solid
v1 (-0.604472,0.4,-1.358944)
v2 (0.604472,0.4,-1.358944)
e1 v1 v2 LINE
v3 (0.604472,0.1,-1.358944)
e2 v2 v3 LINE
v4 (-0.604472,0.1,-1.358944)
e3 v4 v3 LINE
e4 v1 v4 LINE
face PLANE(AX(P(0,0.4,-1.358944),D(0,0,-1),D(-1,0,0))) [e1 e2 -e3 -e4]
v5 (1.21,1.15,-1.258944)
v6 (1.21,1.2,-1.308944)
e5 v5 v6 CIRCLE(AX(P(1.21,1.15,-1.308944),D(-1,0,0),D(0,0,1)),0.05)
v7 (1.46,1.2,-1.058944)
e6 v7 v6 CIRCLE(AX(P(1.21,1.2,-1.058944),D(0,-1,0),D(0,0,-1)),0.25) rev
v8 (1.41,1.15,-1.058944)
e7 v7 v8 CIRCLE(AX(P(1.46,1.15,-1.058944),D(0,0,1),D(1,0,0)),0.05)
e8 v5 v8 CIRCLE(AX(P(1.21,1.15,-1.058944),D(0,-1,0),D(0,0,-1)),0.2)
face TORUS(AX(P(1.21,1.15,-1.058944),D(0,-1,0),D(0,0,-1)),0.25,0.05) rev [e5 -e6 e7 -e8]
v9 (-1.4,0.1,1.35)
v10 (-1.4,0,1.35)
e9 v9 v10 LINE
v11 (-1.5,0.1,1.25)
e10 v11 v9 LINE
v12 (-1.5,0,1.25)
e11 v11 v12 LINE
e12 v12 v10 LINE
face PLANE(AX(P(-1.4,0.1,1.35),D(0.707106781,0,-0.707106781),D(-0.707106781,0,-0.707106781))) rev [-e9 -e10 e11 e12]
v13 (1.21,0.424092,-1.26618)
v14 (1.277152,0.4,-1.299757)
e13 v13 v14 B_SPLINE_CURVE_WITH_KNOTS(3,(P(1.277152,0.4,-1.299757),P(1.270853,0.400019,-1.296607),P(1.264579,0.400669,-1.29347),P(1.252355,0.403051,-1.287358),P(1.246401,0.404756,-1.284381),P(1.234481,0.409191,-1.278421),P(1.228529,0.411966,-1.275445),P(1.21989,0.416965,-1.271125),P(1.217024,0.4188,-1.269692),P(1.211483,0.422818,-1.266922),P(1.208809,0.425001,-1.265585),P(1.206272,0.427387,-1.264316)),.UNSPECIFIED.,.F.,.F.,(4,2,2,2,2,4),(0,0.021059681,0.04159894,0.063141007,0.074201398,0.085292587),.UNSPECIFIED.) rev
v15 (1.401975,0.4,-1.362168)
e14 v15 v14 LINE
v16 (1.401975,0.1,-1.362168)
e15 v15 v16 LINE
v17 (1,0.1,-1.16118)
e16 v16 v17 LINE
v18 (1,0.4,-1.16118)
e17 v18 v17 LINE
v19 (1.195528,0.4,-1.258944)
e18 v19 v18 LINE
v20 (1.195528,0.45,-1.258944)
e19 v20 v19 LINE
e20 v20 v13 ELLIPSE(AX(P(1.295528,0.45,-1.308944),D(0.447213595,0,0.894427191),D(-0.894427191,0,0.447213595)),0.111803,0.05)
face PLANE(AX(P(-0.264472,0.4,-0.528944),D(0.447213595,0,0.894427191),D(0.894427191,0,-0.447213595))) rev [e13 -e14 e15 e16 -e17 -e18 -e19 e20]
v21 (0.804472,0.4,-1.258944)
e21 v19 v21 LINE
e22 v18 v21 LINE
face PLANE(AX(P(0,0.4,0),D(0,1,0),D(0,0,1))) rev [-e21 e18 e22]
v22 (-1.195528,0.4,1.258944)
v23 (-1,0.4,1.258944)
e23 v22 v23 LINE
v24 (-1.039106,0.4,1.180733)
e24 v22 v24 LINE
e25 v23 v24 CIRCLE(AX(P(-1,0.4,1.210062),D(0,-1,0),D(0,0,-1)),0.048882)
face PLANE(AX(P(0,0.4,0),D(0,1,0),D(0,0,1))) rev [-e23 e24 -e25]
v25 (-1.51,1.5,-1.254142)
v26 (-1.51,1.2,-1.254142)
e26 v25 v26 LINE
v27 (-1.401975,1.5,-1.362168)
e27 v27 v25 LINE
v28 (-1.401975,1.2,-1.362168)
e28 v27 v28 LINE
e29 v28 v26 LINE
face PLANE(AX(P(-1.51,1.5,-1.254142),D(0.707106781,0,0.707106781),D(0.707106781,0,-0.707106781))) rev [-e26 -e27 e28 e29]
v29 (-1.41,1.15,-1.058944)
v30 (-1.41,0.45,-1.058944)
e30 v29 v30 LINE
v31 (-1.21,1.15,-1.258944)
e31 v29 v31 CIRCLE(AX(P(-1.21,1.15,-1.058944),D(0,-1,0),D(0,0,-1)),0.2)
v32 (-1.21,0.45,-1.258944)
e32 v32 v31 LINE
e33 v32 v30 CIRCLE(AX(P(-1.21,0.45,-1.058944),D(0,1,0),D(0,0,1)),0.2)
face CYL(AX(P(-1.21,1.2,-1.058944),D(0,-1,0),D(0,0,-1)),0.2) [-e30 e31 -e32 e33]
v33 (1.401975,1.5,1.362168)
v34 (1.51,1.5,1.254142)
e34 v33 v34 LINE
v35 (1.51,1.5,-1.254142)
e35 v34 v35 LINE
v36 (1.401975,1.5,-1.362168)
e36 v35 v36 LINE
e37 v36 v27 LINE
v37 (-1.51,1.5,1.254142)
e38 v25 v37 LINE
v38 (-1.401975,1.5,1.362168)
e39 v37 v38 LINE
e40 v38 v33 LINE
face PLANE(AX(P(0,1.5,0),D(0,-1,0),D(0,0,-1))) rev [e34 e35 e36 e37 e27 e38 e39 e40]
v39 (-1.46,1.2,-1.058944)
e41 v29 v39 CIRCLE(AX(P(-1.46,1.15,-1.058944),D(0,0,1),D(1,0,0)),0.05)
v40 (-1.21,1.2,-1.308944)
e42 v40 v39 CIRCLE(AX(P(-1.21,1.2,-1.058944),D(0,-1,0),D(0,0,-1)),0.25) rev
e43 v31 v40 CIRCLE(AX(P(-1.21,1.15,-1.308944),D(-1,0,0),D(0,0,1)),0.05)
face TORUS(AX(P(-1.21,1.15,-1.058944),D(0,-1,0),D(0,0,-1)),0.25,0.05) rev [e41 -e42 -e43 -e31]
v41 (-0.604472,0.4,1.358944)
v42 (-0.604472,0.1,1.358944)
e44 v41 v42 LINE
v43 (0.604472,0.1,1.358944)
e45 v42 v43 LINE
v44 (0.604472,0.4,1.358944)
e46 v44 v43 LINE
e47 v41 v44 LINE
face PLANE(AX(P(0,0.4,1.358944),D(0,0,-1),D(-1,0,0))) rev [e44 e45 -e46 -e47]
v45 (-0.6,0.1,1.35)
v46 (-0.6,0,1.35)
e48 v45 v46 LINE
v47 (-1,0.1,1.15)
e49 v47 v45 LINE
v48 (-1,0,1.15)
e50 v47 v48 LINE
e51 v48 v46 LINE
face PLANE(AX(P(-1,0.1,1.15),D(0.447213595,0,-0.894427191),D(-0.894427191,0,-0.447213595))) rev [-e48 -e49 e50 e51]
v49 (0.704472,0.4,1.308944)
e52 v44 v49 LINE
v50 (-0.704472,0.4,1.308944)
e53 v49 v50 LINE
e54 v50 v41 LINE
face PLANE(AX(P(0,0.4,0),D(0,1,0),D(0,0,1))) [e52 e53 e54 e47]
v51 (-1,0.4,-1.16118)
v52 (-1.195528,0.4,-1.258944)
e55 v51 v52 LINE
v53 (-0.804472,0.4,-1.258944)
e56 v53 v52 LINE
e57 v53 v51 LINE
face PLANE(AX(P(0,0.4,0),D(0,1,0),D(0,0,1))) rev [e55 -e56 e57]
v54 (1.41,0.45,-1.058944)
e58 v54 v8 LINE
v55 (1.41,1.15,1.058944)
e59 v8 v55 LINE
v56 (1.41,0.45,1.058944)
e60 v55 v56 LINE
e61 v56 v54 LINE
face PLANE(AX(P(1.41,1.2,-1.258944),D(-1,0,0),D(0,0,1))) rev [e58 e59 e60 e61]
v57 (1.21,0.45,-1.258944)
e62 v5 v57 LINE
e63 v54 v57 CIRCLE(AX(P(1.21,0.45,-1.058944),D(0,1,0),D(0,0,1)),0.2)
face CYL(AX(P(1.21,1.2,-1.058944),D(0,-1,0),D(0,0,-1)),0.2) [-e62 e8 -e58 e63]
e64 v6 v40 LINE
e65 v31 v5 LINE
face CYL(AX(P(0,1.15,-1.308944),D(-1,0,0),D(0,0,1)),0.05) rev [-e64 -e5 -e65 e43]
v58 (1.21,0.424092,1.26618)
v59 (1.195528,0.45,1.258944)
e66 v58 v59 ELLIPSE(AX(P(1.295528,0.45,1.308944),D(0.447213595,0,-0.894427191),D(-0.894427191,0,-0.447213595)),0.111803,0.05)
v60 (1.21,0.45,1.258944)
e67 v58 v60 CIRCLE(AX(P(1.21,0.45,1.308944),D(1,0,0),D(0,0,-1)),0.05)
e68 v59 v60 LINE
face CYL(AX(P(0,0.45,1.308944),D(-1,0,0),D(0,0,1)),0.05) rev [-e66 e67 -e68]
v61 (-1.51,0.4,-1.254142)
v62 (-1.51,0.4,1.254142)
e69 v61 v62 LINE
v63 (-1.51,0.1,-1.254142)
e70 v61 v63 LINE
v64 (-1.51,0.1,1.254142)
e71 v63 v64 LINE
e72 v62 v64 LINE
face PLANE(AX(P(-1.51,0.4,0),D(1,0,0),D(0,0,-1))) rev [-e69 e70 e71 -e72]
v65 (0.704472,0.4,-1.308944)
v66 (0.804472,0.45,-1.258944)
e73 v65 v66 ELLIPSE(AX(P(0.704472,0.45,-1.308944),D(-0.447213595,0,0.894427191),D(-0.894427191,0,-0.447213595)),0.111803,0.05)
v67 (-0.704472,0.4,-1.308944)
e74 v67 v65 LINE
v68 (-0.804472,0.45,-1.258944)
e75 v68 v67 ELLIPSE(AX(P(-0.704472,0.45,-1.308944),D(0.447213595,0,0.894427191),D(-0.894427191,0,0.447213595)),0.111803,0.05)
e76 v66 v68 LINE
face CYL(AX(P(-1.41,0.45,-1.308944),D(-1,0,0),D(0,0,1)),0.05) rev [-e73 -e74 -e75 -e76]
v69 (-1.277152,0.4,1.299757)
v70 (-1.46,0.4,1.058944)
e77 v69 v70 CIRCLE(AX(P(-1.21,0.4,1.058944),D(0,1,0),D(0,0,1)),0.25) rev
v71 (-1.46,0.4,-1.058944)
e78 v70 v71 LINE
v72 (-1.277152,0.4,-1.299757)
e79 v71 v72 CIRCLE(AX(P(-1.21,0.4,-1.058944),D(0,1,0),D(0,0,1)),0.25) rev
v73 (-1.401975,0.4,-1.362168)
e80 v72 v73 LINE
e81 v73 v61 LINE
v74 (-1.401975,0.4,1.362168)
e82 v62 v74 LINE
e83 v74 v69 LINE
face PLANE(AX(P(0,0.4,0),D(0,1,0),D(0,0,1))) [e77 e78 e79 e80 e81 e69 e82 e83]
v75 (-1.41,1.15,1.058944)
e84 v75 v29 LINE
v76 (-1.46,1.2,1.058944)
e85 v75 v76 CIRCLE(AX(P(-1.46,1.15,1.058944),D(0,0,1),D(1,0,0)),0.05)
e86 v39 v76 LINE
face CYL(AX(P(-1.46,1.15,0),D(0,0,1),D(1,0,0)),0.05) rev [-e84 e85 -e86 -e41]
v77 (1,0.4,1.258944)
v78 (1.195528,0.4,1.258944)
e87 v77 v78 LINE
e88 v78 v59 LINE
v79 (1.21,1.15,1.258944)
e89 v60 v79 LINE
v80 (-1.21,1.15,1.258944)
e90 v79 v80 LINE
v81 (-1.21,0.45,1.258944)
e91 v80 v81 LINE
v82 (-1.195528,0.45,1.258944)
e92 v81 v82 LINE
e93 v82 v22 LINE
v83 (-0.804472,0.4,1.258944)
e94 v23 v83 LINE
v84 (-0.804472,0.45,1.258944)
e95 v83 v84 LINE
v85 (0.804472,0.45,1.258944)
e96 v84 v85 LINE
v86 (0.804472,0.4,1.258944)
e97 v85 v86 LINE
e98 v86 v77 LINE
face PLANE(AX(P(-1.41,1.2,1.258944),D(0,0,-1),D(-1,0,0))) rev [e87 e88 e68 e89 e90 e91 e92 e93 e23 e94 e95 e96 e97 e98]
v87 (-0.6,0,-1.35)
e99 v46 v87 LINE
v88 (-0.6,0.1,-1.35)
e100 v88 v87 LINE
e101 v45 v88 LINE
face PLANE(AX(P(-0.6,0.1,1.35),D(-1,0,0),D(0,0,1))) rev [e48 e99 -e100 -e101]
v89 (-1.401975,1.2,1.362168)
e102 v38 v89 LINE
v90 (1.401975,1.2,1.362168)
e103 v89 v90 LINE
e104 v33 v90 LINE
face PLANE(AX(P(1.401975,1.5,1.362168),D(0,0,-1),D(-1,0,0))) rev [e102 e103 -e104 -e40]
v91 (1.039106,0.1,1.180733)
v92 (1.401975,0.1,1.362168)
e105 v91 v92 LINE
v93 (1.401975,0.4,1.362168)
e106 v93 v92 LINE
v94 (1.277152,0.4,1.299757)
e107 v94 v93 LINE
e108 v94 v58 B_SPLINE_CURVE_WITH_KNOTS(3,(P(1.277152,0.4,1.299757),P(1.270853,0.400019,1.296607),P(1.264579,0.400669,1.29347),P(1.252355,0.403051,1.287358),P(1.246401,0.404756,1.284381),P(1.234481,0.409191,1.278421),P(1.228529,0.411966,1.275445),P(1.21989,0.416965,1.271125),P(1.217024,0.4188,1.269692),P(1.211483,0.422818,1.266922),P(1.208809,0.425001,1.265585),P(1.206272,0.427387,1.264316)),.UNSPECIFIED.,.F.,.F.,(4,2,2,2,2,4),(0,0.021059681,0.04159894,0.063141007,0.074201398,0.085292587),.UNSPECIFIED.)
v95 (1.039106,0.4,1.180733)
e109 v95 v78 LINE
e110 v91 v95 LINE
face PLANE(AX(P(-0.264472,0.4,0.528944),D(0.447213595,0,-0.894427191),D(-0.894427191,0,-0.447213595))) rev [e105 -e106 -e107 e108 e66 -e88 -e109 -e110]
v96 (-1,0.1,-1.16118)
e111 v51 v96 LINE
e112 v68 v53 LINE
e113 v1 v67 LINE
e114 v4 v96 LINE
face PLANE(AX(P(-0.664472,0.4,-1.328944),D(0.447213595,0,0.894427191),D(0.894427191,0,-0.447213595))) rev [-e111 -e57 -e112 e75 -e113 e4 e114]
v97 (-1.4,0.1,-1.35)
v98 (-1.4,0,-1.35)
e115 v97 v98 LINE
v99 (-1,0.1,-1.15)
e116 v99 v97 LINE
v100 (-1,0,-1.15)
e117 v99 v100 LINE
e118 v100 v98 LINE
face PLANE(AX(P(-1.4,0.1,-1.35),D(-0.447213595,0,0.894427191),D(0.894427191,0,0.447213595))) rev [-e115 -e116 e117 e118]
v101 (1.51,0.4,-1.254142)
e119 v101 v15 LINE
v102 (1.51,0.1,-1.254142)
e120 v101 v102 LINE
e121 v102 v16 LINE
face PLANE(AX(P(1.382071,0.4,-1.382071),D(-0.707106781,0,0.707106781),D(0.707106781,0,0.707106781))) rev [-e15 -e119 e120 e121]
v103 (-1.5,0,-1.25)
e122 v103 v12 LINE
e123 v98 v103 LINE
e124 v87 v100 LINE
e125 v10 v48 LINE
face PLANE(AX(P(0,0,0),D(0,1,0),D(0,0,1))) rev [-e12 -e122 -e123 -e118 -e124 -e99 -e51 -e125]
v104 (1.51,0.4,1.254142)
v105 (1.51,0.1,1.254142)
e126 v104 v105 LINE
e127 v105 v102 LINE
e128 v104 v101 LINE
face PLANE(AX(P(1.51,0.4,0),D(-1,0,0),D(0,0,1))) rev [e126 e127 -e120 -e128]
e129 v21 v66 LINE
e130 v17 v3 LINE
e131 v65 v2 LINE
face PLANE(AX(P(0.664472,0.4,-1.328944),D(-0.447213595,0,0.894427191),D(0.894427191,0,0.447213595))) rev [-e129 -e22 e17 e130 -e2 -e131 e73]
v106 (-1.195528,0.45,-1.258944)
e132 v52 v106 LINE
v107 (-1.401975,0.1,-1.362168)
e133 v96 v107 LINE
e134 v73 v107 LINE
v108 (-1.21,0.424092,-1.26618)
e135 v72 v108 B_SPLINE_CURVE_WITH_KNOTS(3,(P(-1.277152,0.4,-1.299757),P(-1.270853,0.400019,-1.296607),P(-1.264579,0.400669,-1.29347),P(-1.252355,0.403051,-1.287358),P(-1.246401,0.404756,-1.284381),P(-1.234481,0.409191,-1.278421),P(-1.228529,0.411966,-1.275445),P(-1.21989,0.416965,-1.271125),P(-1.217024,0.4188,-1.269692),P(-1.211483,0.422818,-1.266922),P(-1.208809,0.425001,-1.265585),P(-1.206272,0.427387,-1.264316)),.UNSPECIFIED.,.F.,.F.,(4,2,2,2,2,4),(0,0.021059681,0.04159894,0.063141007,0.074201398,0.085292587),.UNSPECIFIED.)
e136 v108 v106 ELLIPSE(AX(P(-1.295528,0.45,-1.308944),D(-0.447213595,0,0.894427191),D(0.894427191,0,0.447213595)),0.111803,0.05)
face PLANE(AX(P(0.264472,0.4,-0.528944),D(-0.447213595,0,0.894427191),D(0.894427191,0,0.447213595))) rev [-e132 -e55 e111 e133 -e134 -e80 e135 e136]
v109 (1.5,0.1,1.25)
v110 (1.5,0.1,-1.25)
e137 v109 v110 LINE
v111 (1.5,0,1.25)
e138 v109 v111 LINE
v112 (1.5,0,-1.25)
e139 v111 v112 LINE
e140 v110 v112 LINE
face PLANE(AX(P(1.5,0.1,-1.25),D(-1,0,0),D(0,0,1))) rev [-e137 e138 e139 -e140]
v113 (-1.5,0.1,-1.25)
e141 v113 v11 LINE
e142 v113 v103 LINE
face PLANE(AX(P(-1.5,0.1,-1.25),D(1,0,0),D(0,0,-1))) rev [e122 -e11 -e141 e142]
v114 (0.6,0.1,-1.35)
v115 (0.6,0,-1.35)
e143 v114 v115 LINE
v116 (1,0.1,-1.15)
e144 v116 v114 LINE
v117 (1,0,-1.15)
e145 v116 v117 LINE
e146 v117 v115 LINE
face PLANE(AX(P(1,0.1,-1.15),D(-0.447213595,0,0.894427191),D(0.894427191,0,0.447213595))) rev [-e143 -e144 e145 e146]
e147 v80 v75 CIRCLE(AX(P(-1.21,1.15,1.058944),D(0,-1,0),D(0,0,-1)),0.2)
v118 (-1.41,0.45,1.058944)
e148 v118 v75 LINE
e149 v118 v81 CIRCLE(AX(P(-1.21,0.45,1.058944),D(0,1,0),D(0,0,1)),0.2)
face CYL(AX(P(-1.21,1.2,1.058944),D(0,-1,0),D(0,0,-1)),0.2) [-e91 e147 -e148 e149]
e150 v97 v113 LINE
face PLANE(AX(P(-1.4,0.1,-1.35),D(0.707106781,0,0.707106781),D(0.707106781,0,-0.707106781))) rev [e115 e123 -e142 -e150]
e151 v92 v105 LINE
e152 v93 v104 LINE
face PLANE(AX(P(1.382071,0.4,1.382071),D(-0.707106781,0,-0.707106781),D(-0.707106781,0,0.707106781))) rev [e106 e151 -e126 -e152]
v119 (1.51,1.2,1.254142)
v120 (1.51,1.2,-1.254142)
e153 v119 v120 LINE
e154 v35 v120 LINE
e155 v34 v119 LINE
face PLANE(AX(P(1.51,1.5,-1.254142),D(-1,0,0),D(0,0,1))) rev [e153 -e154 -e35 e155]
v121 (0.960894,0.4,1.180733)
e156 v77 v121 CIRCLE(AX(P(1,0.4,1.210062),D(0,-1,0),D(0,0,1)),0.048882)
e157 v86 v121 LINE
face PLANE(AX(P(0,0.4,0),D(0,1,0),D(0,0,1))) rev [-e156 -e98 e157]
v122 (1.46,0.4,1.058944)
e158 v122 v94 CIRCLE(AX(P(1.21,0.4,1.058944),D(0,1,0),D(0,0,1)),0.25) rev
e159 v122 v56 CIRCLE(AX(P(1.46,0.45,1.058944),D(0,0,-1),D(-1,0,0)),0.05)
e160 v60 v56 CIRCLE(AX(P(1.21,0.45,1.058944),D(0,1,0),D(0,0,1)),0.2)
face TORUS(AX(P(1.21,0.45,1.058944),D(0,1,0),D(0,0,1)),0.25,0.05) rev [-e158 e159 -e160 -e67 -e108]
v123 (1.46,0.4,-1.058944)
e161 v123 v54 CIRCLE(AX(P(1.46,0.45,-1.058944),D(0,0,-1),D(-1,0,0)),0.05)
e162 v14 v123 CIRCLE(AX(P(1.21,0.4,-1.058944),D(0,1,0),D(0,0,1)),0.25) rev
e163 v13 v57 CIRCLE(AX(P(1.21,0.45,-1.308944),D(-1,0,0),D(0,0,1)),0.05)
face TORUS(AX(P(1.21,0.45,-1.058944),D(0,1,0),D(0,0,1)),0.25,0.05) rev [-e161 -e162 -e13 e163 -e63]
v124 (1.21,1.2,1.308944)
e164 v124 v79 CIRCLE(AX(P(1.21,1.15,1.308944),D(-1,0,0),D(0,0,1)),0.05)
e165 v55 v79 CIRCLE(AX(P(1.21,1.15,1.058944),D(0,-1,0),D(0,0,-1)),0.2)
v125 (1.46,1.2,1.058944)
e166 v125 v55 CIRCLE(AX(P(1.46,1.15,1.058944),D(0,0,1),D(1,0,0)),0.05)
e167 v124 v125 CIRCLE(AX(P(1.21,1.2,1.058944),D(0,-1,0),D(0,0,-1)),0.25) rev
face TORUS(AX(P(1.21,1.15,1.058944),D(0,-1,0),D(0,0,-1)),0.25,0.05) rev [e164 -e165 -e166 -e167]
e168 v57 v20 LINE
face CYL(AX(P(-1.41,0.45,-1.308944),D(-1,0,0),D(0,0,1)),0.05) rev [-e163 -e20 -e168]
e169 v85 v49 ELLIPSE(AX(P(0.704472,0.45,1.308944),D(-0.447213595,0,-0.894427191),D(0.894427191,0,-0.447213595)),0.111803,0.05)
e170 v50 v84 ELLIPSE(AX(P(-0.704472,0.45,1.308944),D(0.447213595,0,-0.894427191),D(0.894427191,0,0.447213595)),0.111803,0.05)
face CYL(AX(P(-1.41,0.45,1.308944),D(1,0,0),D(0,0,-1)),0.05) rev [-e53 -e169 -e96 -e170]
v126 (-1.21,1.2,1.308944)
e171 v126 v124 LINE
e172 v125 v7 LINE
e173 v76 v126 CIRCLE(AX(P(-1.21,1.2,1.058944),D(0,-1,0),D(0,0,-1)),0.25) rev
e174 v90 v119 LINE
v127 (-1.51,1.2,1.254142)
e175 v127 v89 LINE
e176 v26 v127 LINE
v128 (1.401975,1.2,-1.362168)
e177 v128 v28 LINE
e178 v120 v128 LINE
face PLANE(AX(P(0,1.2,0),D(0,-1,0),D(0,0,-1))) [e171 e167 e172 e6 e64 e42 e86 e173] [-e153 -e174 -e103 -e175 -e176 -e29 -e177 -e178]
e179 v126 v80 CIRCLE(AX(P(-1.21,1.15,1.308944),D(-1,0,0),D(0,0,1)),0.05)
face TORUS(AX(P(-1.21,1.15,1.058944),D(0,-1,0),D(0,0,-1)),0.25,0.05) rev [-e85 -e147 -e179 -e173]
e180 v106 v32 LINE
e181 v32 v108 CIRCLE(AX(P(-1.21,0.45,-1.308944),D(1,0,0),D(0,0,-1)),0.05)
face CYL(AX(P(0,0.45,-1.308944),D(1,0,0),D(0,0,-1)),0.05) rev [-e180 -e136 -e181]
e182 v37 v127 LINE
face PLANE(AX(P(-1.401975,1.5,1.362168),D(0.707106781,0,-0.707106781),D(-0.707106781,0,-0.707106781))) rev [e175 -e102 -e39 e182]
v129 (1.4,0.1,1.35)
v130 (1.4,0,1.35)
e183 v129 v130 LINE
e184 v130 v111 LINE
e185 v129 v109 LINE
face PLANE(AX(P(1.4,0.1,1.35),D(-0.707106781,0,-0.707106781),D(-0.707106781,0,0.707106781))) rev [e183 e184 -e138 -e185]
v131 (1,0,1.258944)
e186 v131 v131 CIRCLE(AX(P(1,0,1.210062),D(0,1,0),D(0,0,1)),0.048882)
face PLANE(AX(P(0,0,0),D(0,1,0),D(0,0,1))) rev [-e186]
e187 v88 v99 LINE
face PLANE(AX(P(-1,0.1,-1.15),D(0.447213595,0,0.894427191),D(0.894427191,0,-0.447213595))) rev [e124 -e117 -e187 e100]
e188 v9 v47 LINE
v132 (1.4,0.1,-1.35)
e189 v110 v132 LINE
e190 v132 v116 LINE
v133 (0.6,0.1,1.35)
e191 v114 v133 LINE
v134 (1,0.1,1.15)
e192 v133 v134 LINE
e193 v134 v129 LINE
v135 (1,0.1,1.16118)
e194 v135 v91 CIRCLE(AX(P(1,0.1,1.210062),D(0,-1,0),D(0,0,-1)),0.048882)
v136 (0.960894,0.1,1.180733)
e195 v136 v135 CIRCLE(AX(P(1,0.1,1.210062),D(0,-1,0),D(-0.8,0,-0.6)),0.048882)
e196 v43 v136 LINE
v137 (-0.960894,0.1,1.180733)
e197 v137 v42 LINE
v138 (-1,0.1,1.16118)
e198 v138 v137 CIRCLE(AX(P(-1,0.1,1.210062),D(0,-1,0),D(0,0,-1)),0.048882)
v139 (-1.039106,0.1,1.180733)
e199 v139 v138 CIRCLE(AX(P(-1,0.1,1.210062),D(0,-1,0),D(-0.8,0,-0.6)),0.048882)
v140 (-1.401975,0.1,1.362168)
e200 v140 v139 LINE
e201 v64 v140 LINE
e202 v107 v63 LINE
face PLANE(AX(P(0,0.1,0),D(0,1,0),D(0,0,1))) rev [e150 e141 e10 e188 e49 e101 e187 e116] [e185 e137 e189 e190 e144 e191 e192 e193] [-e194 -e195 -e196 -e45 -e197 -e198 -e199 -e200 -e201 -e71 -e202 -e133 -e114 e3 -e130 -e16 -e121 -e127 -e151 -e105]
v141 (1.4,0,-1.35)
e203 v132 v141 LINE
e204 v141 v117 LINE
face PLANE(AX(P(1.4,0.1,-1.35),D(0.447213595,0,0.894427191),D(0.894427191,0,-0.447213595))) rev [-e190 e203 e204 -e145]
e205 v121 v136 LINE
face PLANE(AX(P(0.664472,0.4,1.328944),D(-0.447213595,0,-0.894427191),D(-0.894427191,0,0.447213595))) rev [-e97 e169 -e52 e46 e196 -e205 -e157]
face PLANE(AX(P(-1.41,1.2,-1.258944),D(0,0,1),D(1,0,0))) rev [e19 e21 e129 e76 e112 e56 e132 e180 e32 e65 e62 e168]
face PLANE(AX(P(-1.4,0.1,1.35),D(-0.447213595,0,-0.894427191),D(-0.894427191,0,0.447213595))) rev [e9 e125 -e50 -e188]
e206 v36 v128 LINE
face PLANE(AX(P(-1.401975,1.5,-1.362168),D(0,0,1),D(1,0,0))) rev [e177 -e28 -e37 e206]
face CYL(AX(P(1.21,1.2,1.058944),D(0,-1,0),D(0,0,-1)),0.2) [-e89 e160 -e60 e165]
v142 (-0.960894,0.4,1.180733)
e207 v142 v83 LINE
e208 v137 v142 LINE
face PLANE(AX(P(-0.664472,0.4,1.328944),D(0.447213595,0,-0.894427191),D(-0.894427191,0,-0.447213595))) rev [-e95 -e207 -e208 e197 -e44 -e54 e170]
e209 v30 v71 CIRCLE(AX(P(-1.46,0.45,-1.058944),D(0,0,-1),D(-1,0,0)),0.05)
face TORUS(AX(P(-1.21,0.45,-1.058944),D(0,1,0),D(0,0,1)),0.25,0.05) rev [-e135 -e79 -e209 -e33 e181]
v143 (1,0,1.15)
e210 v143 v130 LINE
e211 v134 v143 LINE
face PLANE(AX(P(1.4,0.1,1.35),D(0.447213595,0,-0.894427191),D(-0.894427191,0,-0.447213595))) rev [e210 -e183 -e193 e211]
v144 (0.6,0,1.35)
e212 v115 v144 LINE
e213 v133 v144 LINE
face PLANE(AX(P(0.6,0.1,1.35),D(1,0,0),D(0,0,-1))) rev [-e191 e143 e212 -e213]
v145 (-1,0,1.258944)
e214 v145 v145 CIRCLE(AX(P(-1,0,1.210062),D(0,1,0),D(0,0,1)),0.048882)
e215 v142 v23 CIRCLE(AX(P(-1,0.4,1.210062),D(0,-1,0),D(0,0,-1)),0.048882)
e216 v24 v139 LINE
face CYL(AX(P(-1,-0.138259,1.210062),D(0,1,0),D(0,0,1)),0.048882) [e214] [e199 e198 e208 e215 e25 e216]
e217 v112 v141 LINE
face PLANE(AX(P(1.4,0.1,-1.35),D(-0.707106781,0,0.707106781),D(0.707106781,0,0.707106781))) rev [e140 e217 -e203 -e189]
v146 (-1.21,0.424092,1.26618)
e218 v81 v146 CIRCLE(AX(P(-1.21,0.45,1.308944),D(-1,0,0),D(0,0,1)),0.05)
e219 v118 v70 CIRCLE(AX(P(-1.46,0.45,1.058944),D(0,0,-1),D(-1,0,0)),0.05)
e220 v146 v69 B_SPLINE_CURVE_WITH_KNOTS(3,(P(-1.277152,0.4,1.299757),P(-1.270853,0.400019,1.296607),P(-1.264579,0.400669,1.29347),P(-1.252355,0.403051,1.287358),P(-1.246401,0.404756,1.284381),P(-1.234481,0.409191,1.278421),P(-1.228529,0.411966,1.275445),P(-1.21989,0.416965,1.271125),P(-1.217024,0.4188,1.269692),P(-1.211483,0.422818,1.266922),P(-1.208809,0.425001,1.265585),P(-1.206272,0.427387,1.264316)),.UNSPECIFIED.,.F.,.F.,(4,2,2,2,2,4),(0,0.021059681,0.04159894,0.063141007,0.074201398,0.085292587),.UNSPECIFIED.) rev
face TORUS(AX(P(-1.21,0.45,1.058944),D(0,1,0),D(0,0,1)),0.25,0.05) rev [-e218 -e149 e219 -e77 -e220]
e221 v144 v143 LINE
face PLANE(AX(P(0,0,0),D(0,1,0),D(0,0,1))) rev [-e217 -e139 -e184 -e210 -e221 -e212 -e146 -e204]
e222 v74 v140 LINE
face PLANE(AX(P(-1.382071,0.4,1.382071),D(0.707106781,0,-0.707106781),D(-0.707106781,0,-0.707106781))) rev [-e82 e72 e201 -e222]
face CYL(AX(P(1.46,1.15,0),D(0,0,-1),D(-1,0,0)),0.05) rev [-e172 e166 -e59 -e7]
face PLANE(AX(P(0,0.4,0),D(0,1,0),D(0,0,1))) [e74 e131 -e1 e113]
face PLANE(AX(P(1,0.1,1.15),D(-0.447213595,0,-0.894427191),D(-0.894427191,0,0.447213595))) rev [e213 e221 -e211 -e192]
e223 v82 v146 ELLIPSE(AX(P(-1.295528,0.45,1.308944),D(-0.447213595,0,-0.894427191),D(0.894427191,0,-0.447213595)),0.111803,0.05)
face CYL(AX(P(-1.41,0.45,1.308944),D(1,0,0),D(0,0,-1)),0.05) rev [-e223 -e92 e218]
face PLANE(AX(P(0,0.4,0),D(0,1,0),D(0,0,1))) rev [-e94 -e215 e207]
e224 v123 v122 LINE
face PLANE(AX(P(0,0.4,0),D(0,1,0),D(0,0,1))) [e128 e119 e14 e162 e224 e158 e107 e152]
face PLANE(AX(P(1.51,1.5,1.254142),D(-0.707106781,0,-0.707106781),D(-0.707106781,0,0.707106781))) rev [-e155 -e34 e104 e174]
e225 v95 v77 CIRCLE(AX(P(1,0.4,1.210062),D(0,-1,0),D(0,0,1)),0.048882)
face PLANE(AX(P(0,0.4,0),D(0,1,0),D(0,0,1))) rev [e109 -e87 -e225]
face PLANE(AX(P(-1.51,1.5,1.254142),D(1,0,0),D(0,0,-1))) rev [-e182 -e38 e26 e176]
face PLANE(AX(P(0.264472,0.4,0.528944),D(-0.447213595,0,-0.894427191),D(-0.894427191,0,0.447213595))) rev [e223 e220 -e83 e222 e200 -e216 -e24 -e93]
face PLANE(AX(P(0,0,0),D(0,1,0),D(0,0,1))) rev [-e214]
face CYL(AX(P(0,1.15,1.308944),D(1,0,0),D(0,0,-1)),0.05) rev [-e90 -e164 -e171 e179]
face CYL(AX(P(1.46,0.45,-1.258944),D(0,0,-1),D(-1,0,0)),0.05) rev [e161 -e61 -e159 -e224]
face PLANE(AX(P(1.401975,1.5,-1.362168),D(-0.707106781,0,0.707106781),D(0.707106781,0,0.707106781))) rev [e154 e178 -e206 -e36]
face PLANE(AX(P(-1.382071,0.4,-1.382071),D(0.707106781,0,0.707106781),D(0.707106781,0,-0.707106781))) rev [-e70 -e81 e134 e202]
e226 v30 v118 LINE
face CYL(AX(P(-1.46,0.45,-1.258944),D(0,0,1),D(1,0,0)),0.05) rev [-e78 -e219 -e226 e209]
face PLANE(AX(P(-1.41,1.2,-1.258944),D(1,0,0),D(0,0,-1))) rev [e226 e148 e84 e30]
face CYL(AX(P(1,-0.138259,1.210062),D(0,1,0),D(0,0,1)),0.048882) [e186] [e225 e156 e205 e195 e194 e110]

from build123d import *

# Parameters (mm, degrees)
RESSALTO_EXTRUS_O1_DEPTH   = 0.1
RESSALTO_EXTRUS_O1_2_DEPTH = 0.1
RESSALTO_EXTRUS_O2_DEPTH   = 0.3
ESBO_O3_W                  = 2.82
ESBO_O3_H                  = 2.517888544
RESSALTO_EXTRUS_O3_DEPTH   = 0.8
RESSALTO_EXTRUS_O4_DEPTH   = 0.3
FILETE1_R                  = 0.2
FILETE2_R                  = 0.05
FILETE3_R                  = 0.05
RESSALTO_EXTRUS_O5_REACH   = 4.312
ESBO_O5_R                  = 0.048881966


with BuildPart() as part:
    # Esboço1 → Ressalto-extrusão1 (new body)
    with BuildSketch(Plane(origin=(0, 0, 0), x_dir=(1, 0, 0), z_dir=(0, 1, 0))):
        Polygon((-1.5, 1.25), (-1.5, -1.25), (-1.4, -1.35), (-1, -1.15), (-0.6, -1.35), (-0.6, 1.35), (-1, 1.15), (-1.4, 1.35), align=None)
    extrude(amount=RESSALTO_EXTRUS_O1_DEPTH)



with BuildPart() as body_2:
    # Esboço1 → Ressalto-extrus_o1 2 (new body)
    with BuildSketch(Plane(origin=(0, 0, 0), x_dir=(1, 0, 0), z_dir=(0, 1, 0))):
        Polygon((1.4, -1.35), (1.5, -1.25), (1.5, 1.25), (1.4, 1.35), (1, 1.15), (0.6, 1.35), (0.6, -1.35), (1, -1.15), align=None)
    extrude(amount=RESSALTO_EXTRUS_O1_2_DEPTH)


with BuildPart() as part_1:
    add(part.part)

    add(body_2.part)  # Ressalto-extrusão2 merges body 2
    # Esboço2 → Ressalto-extrusão2 (add)
    with BuildSketch(Plane(origin=(0, 0.1, 0), x_dir=(1, 0, 0), z_dir=(0, 1, 0))):
        Polygon((-0.604472136, 1.358944272), (-1, 1.16118034), (-1.40197453, 1.362167605), (-1.51, 1.254142136), (-1.51, -1.254142136), (-1.40197453, -1.362167605), (-1, -1.16118034), (-0.604472136, -1.358944272), (0.604472136, -1.358944272), (1, -1.16118034), (1.40197453, -1.362167605), (1.51, -1.254142136), (1.51, 1.254142136), (1.40197453, 1.362167605), (1, 1.16118034), (0.604472136, 1.358944272), align=None)
    extrude(amount=RESSALTO_EXTRUS_O2_DEPTH)

    # Esboço3 → Ressalto-extrusão3 (add)
    with BuildSketch(Plane(origin=(0, 0.4, 0), x_dir=(1, 0, 0), z_dir=(0, 1, 0))):
        Rectangle(ESBO_O3_W, ESBO_O3_H)
    extrude(amount=RESSALTO_EXTRUS_O3_DEPTH)

    # Esboço4 → Ressalto-extrusão4 (add)
    with BuildSketch(Plane(origin=(0, 1.2, 0), x_dir=(1, 0, 0), z_dir=(0, 1, 0))):
        Polygon((-1.51, 1.254142136), (-1.40197453, 1.362167605), (1.40197453, 1.362167605), (1.51, 1.254142136), (1.51, -1.254142136), (1.40197453, -1.362167605), (-1.40197453, -1.362167605), (-1.51, -1.254142136), align=None)
    extrude(amount=RESSALTO_EXTRUS_O4_DEPTH)

    # Filete1
    filete1_edges = [part_1.edges().sort_by_distance(p)[0] for p in [
        (1.41, 0.8, 1.258944272),
        (1.41, 0.8, -1.258944272),
        (-1.41, 0.8, -1.258944272),
        (-1.41, 0.8, 1.258944272),
    ]]
    fillet(filete1_edges, radius=FILETE1_R)

    # Filete2
    filete2_edges = [part_1.edges().sort_by_distance(p)[0] for p in [
        (-1.41, 1.2, 0),
        (0, 1.2, -1.258944272),
        (1.41, 1.2, 0),
        (0, 1.2, 1.258944272),
        (-1.351421356, 1.2, -1.200365628),
        (1.351421356, 1.2, -1.200365628),
        (1.351421356, 1.2, 1.200365628),
        (-1.351421356, 1.2, 1.200365628),
    ]]
    fillet(filete2_edges, radius=FILETE2_R)

    # Filete3
    # the kernel refuses this fillet: 0.05 mm, written as the material it adds along each edge
    with BuildSketch(Plane(origin=(-1.41, 0.4, 1.058944272), x_dir=(0, 1, 0), z_dir=(0, 0, -1)), Plane(origin=(1.41, 0.4, -1.058944272), x_dir=(0, 1, 0), z_dir=(0, 0, 1))) as filete3_piece_1:
        with BuildLine():
            CenterArc((FILETE3_R, -FILETE3_R), FILETE3_R, 90, 90)
            Line((0, -FILETE3_R), (0, 0))
            Line((0, 0), (FILETE3_R, 0))
        make_face()
    extrude(amount=2.117888544)
    with BuildSketch(Plane(origin=(1.070527864, 0.4, -1.258944272), x_dir=(0, 1, 0), z_dir=(1, 0, 0))) as filete3_piece_2_section:
        with BuildLine():
            CenterArc((FILETE3_R, -FILETE3_R), FILETE3_R, 90, 90)
            Line((0, -FILETE3_R), (0, 0))
            Line((0, 0), (FILETE3_R, 0))
        make_face()
    filete3_piece_2 = extrude(amount=0.139472136, mode=Mode.PRIVATE)
    filete3_piece_2 = split(filete3_piece_2, bisect_by=Plane(origin=(1.203892593, 0.418399611, -1.263126636), z_dir=(0.4472135954999593, 0, 0.8944271909999152)), keep=Keep.TOP, mode=Mode.PRIVATE)
    add(filete3_piece_2)
    with BuildSketch(Plane(origin=(-1.070527864, 0.4, 1.258944272), x_dir=(0, 1, 0), z_dir=(-1, 0, 0))) as filete3_piece_3_section:
        with BuildLine():
            CenterArc((FILETE3_R, -FILETE3_R), FILETE3_R, 90, 90)
            Line((0, -FILETE3_R), (0, 0))
            Line((0, 0), (FILETE3_R, 0))
        make_face()
    filete3_piece_3 = extrude(amount=0.139472136, mode=Mode.PRIVATE)
    filete3_piece_3 = split(filete3_piece_3, bisect_by=Plane(origin=(-1.203892593, 0.418399611, 1.263126636), z_dir=(-0.44721359549995854, 0, -0.8944271909999156)), keep=Keep.TOP, mode=Mode.PRIVATE)
    add(filete3_piece_3)
    with BuildSketch(Plane(origin=(-1.21, 0.4, -1.058944272), x_dir=(0, 0, -1), z_dir=(1, 0, 0))) as filete3_piece_4_section:
        with BuildLine():
            CenterArc((0.2 + FILETE3_R, FILETE3_R), FILETE3_R, 180, 90)
            Line((0.2 + FILETE3_R, 0), (0.2, 0))
            Line((0.2, 0), (0.2, FILETE3_R))
        make_face()
    filete3_piece_4 = revolve(axis=Axis((-1.21, 0.4, -1.058944272), (0, 1, 0)), revolution_arc=90, mode=Mode.PRIVATE)
    filete3_piece_4 = split(filete3_piece_4, bisect_by=Plane(origin=(-1.30894977, 0.414305441, -1.315655225), z_dir=(-0.44721359549995854, 0, 0.8944271909999156)), keep=Keep.TOP, mode=Mode.PRIVATE)
    add(filete3_piece_4)
    with BuildSketch(Plane(origin=(1.21, 0.4, -1.058944272), x_dir=(0, 0, -1), z_dir=(-1, 0, 0))) as filete3_piece_5_section:
        with BuildLine():
            CenterArc((0.2 + FILETE3_R, -FILETE3_R), FILETE3_R, 90, 90)
            Line((0.2 + FILETE3_R, 0), (0.2, 0))
            Line((0.2, 0), (0.2, -FILETE3_R))
        make_face()
    filete3_piece_5 = revolve(axis=Axis((1.21, 0.4, -1.058944272), (0, -1, 0)), revolution_arc=90, mode=Mode.PRIVATE)
    filete3_piece_5 = split(filete3_piece_5, bisect_by=Plane(origin=(1.30894977, 0.414305441, -1.315655225), z_dir=(0.4472135954999593, 0, 0.8944271909999152)), keep=Keep.TOP, mode=Mode.PRIVATE)
    add(filete3_piece_5)
    with BuildSketch(Plane(origin=(1.21, 0.4, 1.058944272), x_dir=(1, 0, 0), z_dir=(0, 0, -1))) as filete3_piece_6_section:
        with BuildLine():
            CenterArc((0.2 + FILETE3_R, -FILETE3_R), FILETE3_R, 90, 90)
            Line((0.2 + FILETE3_R, 0), (0.2, 0))
            Line((0.2, 0), (0.2, -FILETE3_R))
        make_face()
    filete3_piece_6 = revolve(axis=Axis((1.21, 0.4, 1.058944272), (0, -1, 0)), revolution_arc=90, mode=Mode.PRIVATE)
    filete3_piece_6 = split(filete3_piece_6, bisect_by=Plane(origin=(1.30894977, 0.414305441, 1.315655225), z_dir=(0.4472135954999591, 0, -0.8944271909999153)), keep=Keep.TOP, mode=Mode.PRIVATE)
    add(filete3_piece_6)
    with BuildSketch(Plane(origin=(-1.21, 0.4, 1.058944272), x_dir=(0, 0, 1), z_dir=(1, 0, 0))) as filete3_piece_7_section:
        with BuildLine():
            CenterArc((0.2 + FILETE3_R, -FILETE3_R), FILETE3_R, 90, 90)
            Line((0.2 + FILETE3_R, 0), (0.2, 0))
            Line((0.2, 0), (0.2, -FILETE3_R))
        make_face()
    filete3_piece_7 = revolve(axis=Axis((-1.21, 0.4, 1.058944272), (0, -1, 0)), revolution_arc=90, mode=Mode.PRIVATE)
    filete3_piece_7 = split(filete3_piece_7, bisect_by=Plane(origin=(-1.30894977, 0.414305441, 1.315655225), z_dir=(-0.44721359549995854, 0, -0.8944271909999156)), keep=Keep.TOP, mode=Mode.PRIVATE)
    add(filete3_piece_7)
    with BuildSketch(Plane(origin=(-1.21, 0.4, -1.258944272), x_dir=(0, 1, 0), z_dir=(1, 0, 0))) as filete3_piece_8_section:
        with BuildLine():
            CenterArc((FILETE3_R, -FILETE3_R), FILETE3_R, 90, 90)
            Line((0, -FILETE3_R), (0, 0))
            Line((0, 0), (FILETE3_R, 0))
        make_face()
    filete3_piece_8 = extrude(amount=0.139472136, mode=Mode.PRIVATE)
    filete3_piece_8 = split(filete3_piece_8, bisect_by=Plane(origin=(-1.203892593, 0.418399611, -1.263126636), z_dir=(-0.44721359549995854, 0, 0.8944271909999156)), keep=Keep.TOP, mode=Mode.PRIVATE)
    add(filete3_piece_8)
    with BuildSketch(Plane(origin=(-0.929472136, 0.4, -1.258944272), x_dir=(0, 1, 0), z_dir=(1, 0, 0))) as filete3_piece_9_section:
        with BuildLine():
            CenterArc((FILETE3_R, -FILETE3_R), FILETE3_R, 90, 90)
            Line((0, -FILETE3_R), (0, 0))
            Line((0, 0), (FILETE3_R, 0))
        make_face()
    filete3_piece_9 = extrude(amount=1.858944272, mode=Mode.PRIVATE)
    filete3_piece_9 = split(filete3_piece_9, bisect_by=Plane(origin=(-0.156516973, 0.41130062, -1.582921854), z_dir=(0.44721359549995937, 0, 0.8944271909999152)), keep=Keep.TOP, mode=Mode.PRIVATE)
    filete3_piece_9 = split(filete3_piece_9, bisect_by=Plane(origin=(0.156516973, 0.41130062, -1.582921854), z_dir=(-0.44721359549995915, 0, 0.8944271909999153)), keep=Keep.TOP, mode=Mode.PRIVATE)
    add(filete3_piece_9)
    with BuildSketch(Plane(origin=(1.21, 0.4, 1.258944272), x_dir=(0, 1, 0), z_dir=(-1, 0, 0))) as filete3_piece_10_section:
        with BuildLine():
            CenterArc((FILETE3_R, -FILETE3_R), FILETE3_R, 90, 90)
            Line((0, -FILETE3_R), (0, 0))
            Line((0, 0), (FILETE3_R, 0))
        make_face()
    filete3_piece_10 = extrude(amount=0.139472136, mode=Mode.PRIVATE)
    filete3_piece_10 = split(filete3_piece_10, bisect_by=Plane(origin=(1.203892593, 0.418399611, 1.263126636), z_dir=(0.4472135954999591, 0, -0.8944271909999153)), keep=Keep.TOP, mode=Mode.PRIVATE)
    add(filete3_piece_10)
    with BuildSketch(Plane(origin=(0.929472136, 0.4, 1.258944272), x_dir=(0, 1, 0), z_dir=(-1, 0, 0))) as filete3_piece_11_section:
        with BuildLine():
            CenterArc((FILETE3_R, -FILETE3_R), FILETE3_R, 90, 90)
            Line((0, -FILETE3_R), (0, 0))
            Line((0, 0), (FILETE3_R, 0))
        make_face()
    filete3_piece_11 = extrude(amount=1.858944272, mode=Mode.PRIVATE)
    filete3_piece_11 = split(filete3_piece_11, bisect_by=Plane(origin=(0.156516973, 0.41130062, 1.582921854), z_dir=(-0.44721359549995876, 0, -0.8944271909999155)), keep=Keep.TOP, mode=Mode.PRIVATE)
    filete3_piece_11 = split(filete3_piece_11, bisect_by=Plane(origin=(-0.156516973, 0.41130062, 1.582921854), z_dir=(0.44721359549995926, 0, -0.8944271909999153)), keep=Keep.TOP, mode=Mode.PRIVATE)
    add(filete3_piece_11)

    # Ressalto-extrusão5: up to this face of the body (flat: up to its plane)
    ressalto_extrus_o5_end = Plane(part_1.part.faces().sort_by_distance((-1.051696165, 0, 0))[0])
    # Esboço5 → Ressalto-extrusão5 (add, up to the picked face)
    with BuildSketch(Plane.XZ.offset(-0.4), mode=Mode.PRIVATE) as ressalto_extrus_o5_sk1:
        with Locations(Location((-1, 1.210062306, 0), (0, 0, 90))):
            Circle(ESBO_O5_R)
    ressalto_extrus_o5_tool1 = split(extrude(ressalto_extrus_o5_sk1.sketch, amount=RESSALTO_EXTRUS_O5_REACH, mode=Mode.PRIVATE), bisect_by=ressalto_extrus_o5_end, keep=Keep.BOTH, mode=Mode.PRIVATE)
    # Esboço5 → Ressalto-extrusão5 (add, up to the picked face)
    with BuildSketch(Plane.XZ.offset(-0.4), mode=Mode.PRIVATE) as ressalto_extrus_o5_sk2:
        with Locations(Location((1, 1.210062306, 0), (0, 0, 90))):
            Circle(ESBO_O5_R)
    ressalto_extrus_o5_tool2 = split(extrude(ressalto_extrus_o5_sk2.sketch, amount=RESSALTO_EXTRUS_O5_REACH, mode=Mode.PRIVATE), bisect_by=ressalto_extrus_o5_end, keep=Keep.BOTH, mode=Mode.PRIVATE)
    add(ressalto_extrus_o5_tool1.solids().sort_by(Axis((-1, 0.4, 1.210062), (0, -1, 0)))[0])
    add(ressalto_extrus_o5_tool2.solids().sort_by(Axis((1, 0.4, 1.210062), (0, -1, 0)))[0])


solid = part_1.part
